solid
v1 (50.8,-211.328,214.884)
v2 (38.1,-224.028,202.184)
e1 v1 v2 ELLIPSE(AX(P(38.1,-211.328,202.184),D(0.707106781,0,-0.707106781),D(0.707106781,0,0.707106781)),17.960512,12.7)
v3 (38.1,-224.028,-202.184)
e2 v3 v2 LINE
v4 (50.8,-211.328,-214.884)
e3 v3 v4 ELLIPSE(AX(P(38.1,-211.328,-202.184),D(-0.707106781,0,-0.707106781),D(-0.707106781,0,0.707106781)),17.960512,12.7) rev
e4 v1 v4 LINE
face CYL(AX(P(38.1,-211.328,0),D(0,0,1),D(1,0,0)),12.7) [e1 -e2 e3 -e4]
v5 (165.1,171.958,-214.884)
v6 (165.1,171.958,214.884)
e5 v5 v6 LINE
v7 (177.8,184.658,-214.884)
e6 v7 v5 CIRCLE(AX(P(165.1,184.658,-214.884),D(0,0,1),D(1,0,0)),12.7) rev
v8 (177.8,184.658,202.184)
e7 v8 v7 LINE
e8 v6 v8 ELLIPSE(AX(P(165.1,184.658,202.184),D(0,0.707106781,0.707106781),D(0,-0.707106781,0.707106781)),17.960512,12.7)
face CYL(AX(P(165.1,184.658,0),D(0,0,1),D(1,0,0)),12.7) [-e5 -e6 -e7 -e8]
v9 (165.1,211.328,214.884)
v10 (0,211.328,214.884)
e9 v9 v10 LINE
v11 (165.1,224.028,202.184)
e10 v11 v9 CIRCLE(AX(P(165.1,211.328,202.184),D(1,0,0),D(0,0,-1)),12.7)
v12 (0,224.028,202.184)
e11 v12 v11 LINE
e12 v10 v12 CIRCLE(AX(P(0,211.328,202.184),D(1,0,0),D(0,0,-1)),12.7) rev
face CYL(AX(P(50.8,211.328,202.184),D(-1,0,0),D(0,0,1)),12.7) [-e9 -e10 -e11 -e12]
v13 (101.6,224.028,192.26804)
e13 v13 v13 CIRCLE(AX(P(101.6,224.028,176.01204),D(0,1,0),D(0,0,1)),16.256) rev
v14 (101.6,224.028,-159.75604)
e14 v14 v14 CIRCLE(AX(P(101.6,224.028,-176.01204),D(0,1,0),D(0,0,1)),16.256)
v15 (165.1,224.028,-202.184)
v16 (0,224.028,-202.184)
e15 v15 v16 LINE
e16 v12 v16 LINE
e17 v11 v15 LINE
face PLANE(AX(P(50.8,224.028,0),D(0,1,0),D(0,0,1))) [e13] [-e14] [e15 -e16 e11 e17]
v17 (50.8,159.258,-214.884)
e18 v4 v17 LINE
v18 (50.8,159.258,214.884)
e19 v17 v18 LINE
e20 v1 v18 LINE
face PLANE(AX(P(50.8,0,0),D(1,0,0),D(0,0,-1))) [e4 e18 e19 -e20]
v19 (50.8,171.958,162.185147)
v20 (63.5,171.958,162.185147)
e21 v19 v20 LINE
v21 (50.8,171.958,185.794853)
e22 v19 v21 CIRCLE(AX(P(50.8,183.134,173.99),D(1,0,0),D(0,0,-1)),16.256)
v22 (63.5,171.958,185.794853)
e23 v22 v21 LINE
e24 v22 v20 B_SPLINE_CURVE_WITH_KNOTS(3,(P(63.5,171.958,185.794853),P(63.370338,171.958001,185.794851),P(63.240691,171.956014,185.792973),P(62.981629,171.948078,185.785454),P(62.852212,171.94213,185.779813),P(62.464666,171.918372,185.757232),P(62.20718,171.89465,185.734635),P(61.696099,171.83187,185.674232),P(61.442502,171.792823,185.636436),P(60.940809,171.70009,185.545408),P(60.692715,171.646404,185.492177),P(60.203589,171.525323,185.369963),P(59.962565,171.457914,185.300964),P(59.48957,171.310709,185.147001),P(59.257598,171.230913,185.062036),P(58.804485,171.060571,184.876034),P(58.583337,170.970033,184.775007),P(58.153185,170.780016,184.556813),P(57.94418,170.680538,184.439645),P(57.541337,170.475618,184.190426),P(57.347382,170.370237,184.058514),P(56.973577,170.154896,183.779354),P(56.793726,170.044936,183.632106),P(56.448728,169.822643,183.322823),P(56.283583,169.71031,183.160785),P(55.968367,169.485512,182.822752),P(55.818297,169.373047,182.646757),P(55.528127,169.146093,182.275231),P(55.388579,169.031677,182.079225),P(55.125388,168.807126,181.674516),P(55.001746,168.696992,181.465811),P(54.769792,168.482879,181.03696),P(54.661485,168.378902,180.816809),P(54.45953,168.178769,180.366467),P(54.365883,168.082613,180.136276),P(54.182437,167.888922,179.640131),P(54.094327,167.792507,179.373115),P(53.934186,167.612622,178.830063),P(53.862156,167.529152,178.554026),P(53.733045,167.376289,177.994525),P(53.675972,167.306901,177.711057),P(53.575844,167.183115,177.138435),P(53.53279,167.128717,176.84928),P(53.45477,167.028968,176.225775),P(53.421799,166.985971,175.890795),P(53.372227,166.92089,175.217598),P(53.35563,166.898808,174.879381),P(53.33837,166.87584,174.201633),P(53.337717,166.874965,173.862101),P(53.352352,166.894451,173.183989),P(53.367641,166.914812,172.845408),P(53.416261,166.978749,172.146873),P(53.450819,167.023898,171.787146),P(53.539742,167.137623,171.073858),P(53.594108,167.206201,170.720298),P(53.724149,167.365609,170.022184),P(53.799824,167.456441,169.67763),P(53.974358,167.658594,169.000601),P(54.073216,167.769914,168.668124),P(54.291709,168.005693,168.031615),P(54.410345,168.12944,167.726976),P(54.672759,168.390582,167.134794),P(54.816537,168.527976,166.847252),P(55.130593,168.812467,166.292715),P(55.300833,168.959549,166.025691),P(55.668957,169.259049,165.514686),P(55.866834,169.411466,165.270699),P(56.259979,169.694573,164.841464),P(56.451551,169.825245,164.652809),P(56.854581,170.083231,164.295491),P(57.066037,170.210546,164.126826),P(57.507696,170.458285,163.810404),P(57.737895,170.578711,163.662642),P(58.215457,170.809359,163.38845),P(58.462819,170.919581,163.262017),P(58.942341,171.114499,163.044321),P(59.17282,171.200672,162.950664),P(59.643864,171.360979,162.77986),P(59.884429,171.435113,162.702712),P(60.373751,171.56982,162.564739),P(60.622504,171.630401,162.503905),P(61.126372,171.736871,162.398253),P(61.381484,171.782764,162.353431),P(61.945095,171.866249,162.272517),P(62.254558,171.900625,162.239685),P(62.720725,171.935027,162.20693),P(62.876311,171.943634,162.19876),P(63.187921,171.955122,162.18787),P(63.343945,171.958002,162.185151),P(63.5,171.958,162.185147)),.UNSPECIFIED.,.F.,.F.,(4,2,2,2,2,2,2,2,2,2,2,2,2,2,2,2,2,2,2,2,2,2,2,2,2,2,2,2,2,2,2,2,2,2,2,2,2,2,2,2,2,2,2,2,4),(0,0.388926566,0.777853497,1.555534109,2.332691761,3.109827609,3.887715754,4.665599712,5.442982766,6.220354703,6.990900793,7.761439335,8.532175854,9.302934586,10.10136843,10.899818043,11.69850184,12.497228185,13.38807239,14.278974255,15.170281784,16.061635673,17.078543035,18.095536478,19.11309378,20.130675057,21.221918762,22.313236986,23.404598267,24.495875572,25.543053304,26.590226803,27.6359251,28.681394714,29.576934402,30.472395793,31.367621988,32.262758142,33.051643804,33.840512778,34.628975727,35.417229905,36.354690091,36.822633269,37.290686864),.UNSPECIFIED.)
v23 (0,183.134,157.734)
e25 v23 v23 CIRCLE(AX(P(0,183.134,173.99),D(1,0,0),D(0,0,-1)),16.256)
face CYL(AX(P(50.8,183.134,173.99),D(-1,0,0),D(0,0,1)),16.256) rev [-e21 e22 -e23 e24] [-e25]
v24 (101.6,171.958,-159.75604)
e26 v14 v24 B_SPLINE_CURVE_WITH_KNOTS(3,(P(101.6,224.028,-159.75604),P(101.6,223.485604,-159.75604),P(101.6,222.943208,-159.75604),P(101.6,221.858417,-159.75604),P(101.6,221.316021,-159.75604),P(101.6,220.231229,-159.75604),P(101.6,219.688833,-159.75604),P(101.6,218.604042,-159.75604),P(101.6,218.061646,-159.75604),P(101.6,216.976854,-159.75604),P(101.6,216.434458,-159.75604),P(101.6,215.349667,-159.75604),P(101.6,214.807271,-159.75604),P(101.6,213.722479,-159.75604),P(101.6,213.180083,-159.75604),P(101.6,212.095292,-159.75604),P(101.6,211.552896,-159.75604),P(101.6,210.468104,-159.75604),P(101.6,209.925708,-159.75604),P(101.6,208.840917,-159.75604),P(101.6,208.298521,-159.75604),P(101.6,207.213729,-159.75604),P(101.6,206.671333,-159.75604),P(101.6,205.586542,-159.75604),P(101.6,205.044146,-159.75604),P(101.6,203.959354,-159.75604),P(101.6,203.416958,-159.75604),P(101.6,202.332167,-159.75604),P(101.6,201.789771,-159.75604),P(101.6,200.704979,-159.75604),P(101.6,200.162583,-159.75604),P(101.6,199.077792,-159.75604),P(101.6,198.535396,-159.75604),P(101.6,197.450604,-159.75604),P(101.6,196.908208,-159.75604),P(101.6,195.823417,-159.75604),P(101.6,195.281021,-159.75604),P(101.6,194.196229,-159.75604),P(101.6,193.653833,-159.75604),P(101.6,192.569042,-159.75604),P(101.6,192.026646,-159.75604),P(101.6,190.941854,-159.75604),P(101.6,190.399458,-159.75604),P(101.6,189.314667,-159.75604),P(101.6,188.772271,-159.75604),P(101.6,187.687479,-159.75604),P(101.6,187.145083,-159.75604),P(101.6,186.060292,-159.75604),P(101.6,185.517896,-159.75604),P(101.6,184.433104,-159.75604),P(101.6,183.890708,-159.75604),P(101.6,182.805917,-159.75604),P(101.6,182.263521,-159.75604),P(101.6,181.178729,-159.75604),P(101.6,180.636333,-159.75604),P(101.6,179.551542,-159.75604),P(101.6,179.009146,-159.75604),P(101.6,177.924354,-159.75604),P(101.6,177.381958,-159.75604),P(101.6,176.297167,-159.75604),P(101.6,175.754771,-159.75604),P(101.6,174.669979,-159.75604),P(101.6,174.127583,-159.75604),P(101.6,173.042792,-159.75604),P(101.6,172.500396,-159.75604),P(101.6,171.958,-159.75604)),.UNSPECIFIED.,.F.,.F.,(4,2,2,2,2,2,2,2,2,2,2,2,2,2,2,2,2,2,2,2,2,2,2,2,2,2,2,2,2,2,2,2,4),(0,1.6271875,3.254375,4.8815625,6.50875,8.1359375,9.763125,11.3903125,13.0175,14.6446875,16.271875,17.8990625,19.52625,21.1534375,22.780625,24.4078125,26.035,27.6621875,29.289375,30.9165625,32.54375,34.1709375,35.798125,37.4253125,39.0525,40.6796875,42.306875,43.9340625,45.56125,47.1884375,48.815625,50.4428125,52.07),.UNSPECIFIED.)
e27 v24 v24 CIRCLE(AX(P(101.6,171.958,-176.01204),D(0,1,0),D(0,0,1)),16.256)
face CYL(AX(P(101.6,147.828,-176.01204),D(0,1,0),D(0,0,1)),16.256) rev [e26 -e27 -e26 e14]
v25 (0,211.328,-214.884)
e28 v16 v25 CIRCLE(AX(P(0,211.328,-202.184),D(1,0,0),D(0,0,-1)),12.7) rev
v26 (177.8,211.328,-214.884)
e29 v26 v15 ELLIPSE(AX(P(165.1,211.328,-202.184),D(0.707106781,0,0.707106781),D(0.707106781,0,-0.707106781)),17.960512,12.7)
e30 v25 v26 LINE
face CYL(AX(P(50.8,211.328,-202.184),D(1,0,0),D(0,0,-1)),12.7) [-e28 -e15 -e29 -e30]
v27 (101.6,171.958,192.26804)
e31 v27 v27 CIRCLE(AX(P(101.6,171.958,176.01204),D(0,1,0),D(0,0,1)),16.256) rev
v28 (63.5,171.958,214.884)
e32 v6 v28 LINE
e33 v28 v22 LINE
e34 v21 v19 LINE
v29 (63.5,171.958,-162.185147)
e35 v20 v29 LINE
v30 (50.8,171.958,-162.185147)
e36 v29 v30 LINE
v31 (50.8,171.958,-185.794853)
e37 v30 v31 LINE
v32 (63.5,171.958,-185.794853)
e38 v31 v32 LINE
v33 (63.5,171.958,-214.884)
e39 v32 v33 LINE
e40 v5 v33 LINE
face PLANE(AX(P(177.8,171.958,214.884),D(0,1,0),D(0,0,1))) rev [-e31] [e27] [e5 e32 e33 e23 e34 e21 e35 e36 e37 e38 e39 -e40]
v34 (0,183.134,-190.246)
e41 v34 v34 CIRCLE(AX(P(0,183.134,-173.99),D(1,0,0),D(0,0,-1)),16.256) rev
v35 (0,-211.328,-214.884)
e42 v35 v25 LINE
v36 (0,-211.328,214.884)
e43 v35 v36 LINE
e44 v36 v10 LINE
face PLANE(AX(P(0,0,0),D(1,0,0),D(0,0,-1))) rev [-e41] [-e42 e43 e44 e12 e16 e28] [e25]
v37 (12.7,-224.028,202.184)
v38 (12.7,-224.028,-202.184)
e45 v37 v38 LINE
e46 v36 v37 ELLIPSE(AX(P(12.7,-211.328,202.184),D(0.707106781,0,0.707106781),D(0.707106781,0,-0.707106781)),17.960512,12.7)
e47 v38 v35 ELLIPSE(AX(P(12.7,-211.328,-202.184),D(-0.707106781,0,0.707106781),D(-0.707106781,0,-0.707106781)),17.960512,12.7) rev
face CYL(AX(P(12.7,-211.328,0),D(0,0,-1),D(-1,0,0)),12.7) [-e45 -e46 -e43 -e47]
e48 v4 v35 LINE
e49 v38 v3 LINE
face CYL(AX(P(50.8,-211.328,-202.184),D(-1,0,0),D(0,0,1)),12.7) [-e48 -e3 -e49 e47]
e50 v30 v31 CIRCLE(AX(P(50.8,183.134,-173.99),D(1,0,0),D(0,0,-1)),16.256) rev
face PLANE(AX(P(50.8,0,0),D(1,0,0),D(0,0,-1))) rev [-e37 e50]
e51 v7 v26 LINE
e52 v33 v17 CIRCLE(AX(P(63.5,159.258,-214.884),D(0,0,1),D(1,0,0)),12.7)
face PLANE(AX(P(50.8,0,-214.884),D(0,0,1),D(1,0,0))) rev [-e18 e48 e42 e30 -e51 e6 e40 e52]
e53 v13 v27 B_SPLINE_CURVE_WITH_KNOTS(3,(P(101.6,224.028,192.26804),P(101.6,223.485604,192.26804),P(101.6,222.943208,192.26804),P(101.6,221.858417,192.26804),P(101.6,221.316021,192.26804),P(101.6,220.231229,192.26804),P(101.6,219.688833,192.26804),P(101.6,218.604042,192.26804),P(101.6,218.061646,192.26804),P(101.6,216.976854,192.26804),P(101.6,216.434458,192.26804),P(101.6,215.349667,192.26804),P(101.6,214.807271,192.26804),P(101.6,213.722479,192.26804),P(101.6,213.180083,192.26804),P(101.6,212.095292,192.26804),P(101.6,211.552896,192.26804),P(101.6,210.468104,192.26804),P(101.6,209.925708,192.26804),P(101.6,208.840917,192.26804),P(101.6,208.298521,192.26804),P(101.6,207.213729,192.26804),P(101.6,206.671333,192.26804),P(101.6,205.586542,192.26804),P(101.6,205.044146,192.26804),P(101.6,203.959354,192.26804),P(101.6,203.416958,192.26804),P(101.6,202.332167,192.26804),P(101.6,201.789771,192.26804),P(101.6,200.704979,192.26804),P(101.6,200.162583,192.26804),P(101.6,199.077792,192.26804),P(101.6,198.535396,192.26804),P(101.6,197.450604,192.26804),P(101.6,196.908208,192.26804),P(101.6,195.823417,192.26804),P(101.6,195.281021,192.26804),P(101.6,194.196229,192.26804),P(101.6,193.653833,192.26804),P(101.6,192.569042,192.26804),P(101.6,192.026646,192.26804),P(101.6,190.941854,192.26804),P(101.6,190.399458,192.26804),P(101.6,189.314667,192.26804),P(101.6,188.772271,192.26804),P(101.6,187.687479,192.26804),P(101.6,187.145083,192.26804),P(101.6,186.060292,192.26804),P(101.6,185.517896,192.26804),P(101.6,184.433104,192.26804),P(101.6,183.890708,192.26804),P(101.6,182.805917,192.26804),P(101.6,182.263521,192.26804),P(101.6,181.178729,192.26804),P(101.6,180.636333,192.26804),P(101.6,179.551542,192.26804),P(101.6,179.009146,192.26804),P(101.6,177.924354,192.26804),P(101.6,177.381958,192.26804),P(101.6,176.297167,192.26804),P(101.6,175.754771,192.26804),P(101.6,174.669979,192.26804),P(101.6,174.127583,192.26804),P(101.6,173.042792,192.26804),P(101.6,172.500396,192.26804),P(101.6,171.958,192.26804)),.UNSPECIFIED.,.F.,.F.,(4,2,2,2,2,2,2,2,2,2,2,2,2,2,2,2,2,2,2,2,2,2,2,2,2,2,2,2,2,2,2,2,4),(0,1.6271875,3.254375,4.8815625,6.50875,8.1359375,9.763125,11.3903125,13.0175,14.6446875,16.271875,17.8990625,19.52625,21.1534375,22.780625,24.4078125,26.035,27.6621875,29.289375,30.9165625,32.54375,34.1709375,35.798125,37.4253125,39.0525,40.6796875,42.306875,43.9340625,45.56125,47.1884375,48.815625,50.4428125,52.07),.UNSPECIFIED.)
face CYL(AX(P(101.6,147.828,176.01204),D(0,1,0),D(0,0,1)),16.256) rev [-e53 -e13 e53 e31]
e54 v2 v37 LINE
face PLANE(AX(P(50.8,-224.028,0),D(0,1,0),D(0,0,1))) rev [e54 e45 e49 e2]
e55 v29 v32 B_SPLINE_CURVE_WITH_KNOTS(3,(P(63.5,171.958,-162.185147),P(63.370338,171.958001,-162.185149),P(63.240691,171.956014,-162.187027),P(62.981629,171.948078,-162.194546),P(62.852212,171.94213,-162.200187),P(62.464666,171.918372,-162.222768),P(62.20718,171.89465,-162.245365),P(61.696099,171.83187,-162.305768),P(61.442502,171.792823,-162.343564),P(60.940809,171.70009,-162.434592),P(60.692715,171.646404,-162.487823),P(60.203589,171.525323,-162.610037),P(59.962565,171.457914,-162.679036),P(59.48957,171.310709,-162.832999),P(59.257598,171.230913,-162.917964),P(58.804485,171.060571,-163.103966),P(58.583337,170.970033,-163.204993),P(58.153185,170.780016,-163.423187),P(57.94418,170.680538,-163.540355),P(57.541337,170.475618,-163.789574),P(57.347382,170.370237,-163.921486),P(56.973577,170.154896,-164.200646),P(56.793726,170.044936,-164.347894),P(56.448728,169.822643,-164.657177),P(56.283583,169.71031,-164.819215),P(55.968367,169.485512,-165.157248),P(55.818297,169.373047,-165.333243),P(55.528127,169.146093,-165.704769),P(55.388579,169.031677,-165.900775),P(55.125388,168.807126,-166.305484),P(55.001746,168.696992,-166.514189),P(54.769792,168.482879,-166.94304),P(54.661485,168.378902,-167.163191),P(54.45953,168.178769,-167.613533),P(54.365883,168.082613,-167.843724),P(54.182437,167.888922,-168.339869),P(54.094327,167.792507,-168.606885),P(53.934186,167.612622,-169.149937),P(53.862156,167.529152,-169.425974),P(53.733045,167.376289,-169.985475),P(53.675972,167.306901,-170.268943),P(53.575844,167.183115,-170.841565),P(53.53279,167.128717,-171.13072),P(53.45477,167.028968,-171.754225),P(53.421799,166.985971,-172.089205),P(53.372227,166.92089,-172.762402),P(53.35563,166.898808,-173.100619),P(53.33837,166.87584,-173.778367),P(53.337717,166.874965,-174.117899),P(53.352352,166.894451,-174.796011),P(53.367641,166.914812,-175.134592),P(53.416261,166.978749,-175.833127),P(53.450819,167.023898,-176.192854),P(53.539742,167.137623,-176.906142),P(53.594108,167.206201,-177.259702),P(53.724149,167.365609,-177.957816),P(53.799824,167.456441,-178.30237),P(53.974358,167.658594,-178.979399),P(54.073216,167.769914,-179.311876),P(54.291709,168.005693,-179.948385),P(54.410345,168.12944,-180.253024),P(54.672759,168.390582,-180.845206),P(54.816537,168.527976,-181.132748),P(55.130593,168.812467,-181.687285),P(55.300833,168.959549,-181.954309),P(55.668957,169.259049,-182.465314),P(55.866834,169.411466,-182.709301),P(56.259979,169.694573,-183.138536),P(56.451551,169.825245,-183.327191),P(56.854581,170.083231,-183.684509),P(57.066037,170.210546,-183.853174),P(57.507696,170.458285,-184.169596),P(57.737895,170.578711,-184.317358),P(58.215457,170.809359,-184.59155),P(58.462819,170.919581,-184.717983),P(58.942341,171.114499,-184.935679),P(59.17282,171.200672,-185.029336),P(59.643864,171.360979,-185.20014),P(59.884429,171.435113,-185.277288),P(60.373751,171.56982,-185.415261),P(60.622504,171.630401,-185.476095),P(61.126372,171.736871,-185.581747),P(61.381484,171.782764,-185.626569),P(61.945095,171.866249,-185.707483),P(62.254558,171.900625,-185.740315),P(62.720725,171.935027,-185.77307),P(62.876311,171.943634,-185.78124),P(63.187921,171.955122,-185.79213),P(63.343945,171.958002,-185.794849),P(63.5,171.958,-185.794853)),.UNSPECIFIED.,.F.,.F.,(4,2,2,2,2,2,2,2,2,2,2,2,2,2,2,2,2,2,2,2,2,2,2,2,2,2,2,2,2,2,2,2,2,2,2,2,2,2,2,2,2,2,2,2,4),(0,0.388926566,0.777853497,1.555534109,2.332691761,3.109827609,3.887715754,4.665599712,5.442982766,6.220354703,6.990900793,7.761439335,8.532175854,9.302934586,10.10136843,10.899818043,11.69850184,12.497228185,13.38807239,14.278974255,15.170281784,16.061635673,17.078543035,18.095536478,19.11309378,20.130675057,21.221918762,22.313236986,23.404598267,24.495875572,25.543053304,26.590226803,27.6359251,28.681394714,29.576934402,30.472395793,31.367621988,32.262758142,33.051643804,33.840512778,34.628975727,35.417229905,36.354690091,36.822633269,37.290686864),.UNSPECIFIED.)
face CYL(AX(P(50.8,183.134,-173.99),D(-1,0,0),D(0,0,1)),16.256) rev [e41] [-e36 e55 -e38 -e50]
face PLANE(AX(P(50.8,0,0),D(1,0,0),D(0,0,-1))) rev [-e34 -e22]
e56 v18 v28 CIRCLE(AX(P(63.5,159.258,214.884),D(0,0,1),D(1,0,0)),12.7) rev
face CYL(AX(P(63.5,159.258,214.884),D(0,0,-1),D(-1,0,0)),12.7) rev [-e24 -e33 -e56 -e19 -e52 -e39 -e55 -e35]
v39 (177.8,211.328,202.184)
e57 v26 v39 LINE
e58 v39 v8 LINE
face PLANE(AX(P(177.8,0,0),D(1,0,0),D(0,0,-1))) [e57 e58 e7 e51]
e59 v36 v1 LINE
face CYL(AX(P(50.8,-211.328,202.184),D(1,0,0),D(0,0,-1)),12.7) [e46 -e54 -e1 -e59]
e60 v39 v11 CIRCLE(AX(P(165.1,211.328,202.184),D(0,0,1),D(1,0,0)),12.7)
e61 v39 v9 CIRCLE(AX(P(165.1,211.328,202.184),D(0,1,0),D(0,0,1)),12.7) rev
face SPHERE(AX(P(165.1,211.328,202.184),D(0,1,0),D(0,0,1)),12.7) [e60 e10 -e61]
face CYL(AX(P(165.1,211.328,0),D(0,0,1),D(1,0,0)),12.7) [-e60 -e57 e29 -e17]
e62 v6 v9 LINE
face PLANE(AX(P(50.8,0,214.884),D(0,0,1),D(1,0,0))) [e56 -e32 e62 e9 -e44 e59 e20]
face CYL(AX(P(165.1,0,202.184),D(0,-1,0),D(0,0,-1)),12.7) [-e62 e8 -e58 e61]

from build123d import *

# Parameters (mm, degrees)
SKETCH1_W           = 429.768
SKETCH1_H           = 448.056
SKETCH1_R           = 16.256
BOSS_EXTRUDE1_DEPTH = 50.8
SKETCH2_W           = 429.768
SKETCH2_H           = 52.07
BOSS_EXTRUDE2_DEPTH = 127
SKETCH3_R           = 16.256
CUT_EXTRUDE1_DEPTH  = 76.2
FILLET1_R           = 12.7


with BuildPart() as part:
    # Sketch1 → Boss-Extrude1 (new body)
    with BuildSketch(Plane(origin=(0, 0, 0), x_dir=(0, 0, -1), z_dir=(1, 0, 0))):
        Rectangle(SKETCH1_W, SKETCH1_H)
        with Locations((-173.99, 183.134)):
            Circle(SKETCH1_R, mode=Mode.SUBTRACT)
        with Locations((173.99, 183.134)):
            Circle(SKETCH1_R, mode=Mode.SUBTRACT)
    extrude(amount=BOSS_EXTRUDE1_DEPTH)

    # Sketch2 → Boss-Extrude2 (add)
    with BuildSketch(Plane(origin=(50.8, 0, 0), x_dir=(0, 0, -1), z_dir=(1, 0, 0))):
        with Locations((0, 197.993)):
            Rectangle(SKETCH2_W, SKETCH2_H)
    extrude(amount=BOSS_EXTRUDE2_DEPTH)

    # Sketch3 → Cut-Extrude1 (cut)
    with BuildSketch(Plane(origin=(0, 224.028, 0), x_dir=(1, 0, 0), z_dir=(0, 1, 0))):
        with Locations(Location((101.6, 176.012040492, 0), (0, 0, 270))):
            Circle(SKETCH3_R)
        with Locations(Location((101.6, -176.012040492, 0), (0, 0, 270))):
            Circle(SKETCH3_R)
    extrude(amount=-CUT_EXTRUDE1_DEPTH, mode=Mode.SUBTRACT)

    # Fillet1
    # the kernel refuses this fillet: 12.7 mm, written as the material it adds along each edge
    with BuildSketch(Plane(origin=(50.8, 171.958, -214.884), x_dir=(0, -1, 0), z_dir=(0, 0, 1))) as fillet1_piece_1_section:
        with BuildLine():
            CenterArc((FILLET1_R, FILLET1_R), FILLET1_R, 180, 90)
            Line((0, FILLET1_R), (0, 0))
            Line((0, 0), (FILLET1_R, 0))
        make_face()
    fillet1_piece_1 = extrude(amount=60.839146761, mode=Mode.PRIVATE)
    fillet1_piece_1 = fillet1_piece_1 - Plane(origin=(53.390848129, 183.134, -173.99), x_dir=(0, 0, -1), z_dir=(-1, 0, 0)) * Cylinder(16.256, 173, mode=Mode.PRIVATE)
    add(fillet1_piece_1)
    with BuildSketch(Plane(origin=(50.8, 171.958, -193.935146761), x_dir=(0, -1, 0), z_dir=(0, 0, 1))) as fillet1_piece_2_section:
        with BuildLine():
            CenterArc((FILLET1_R, FILLET1_R), FILLET1_R, 180, 90)
            Line((0, FILLET1_R), (0, 0))
            Line((0, 0), (FILLET1_R, 0))
        make_face()
    fillet1_piece_2 = extrude(amount=387.870293522, mode=Mode.PRIVATE)
    fillet1_piece_2 = fillet1_piece_2 - Plane(origin=(53.573862422, 183.134, 173.99), x_dir=(0, 0, -1), z_dir=(-1, 0, 0)) * Cylinder(16.256, 827, mode=Mode.PRIVATE)
    fillet1_piece_2 = fillet1_piece_2 - Plane(origin=(53.573862422, 183.134, -173.99), x_dir=(0, 0, -1), z_dir=(-1, 0, 0)) * Cylinder(16.256, 827, mode=Mode.PRIVATE)
    add(fillet1_piece_2)
    with BuildSketch(Plane(origin=(50.8, 171.958, 154.044853239), x_dir=(0, -1, 0), z_dir=(0, 0, 1))) as fillet1_piece_3_section:
        with BuildLine():
            CenterArc((FILLET1_R, FILLET1_R), FILLET1_R, 180, 90)
            Line((0, FILLET1_R), (0, 0))
            Line((0, 0), (FILLET1_R, 0))
        make_face()
    fillet1_piece_3 = extrude(amount=60.839146761, mode=Mode.PRIVATE)
    fillet1_piece_3 = fillet1_piece_3 - Plane(origin=(53.390848027, 183.134, 173.99), x_dir=(0, 0, -1), z_dir=(-1, 0, 0)) * Cylinder(16.256, 173, mode=Mode.PRIVATE)
    add(fillet1_piece_3)
    # the kernel refuses this fillet: 12.7 mm, written as the material it takes off along each edge
    with BuildSketch(Plane(origin=(165.1, 211.328, 202.184), x_dir=(1, 0, 0), z_dir=(0, 1, 0))) as fillet1_2_piece_1_section:
        Polygon((0, 0), (FILLET1_R * 1.02, 0), (FILLET1_R * 1.02, -FILLET1_R * 1.02), (0, -FILLET1_R * 1.02), align=None)
    fillet1_2_piece_1 = extrude(amount=FILLET1_R * 1.02, mode=Mode.PRIVATE)
    fillet1_2_piece_1 = fillet1_2_piece_1 - Plane(origin=(165.1, 211.328, 202.184), x_dir=(-0.7071067811865475, 0, -0.7071067811865475), z_dir=(0, 1, 0)) * Sphere(FILLET1_R, mode=Mode.PRIVATE)
    add(fillet1_2_piece_1, mode=Mode.SUBTRACT)
    with BuildSketch(Plane(origin=(-31.75, -224.028, -214.884), x_dir=(0, 0, 1), z_dir=(1, 0, 0))) as fillet1_2_piece_2:
        with BuildLine():
            CenterArc((FILLET1_R, -FILLET1_R), FILLET1_R, 90, 90)
            Line((0, -FILLET1_R), (0, 0))
            Line((0, 0), (FILLET1_R, 0))
        make_face()
    extrude(amount=114.3, mode=Mode.SUBTRACT)
    with BuildSketch(Plane(origin=(-31.75, -224.028, 214.884), x_dir=(0, 0, -1), z_dir=(1, 0, 0))) as fillet1_2_piece_3:
        with BuildLine():
            CenterArc((FILLET1_R, FILLET1_R), FILLET1_R, 180, 90)
            Line((0, FILLET1_R), (0, 0))
            Line((0, 0), (FILLET1_R, 0))
        make_face()
    extrude(amount=114.3, mode=Mode.SUBTRACT)
    with BuildSketch(Plane(origin=(165.1, 224.028, 214.884), x_dir=(0, 0, -1), z_dir=(-1, 0, 0))) as fillet1_2_piece_4:
        with BuildLine():
            CenterArc((FILLET1_R, FILLET1_R), FILLET1_R, 180, 90)
            Line((0, FILLET1_R), (0, 0))
            Line((0, 0), (FILLET1_R, 0))
        make_face()
    extrude(amount=196.85, mode=Mode.SUBTRACT)
    with BuildSketch(Plane(origin=(-31.75, 224.028, -214.884), x_dir=(0, 0, 1), z_dir=(1, 0, 0))) as fillet1_2_piece_5:
        with BuildLine():
            CenterArc((FILLET1_R, FILLET1_R), FILLET1_R, 180, 90)
            Line((0, FILLET1_R), (0, 0))
            Line((0, 0), (FILLET1_R, 0))
        make_face()
    extrude(amount=241.3, mode=Mode.SUBTRACT)
    with BuildSketch(Plane(origin=(177.8, 140.208, 214.884), x_dir=(0, 0, -1), z_dir=(0, 1, 0))) as fillet1_2_piece_6:
        with BuildLine():
            CenterArc((FILLET1_R, FILLET1_R), FILLET1_R, 180, 90)
            Line((0, FILLET1_R), (0, 0))
            Line((0, 0), (FILLET1_R, 0))
        make_face()
    extrude(amount=71.12, mode=Mode.SUBTRACT)
    with BuildSketch(Plane(origin=(177.8, 171.958, -246.634), x_dir=(-1, 0, 0), z_dir=(0, 0, 1)), Plane(origin=(0, -224.028, 246.634), x_dir=(1, 0, 0), z_dir=(0, 0, -1))) as fillet1_2_piece_7:
        with BuildLine():
            CenterArc((FILLET1_R, -FILLET1_R), FILLET1_R, 90, 90)
            Line((0, -FILLET1_R), (0, 0))
            Line((0, 0), (FILLET1_R, 0))
        make_face()
    extrude(amount=493.268, mode=Mode.SUBTRACT)
    with BuildSketch(Plane(origin=(177.8, 224.028, 202.184), x_dir=(-1, 0, 0), z_dir=(0, 0, -1))) as fillet1_2_piece_8:
        with BuildLine():
            CenterArc((FILLET1_R, -FILLET1_R), FILLET1_R, 90, 90)
            Line((0, -FILLET1_R), (0, 0))
            Line((0, 0), (FILLET1_R, 0))
        make_face()
    extrude(amount=448.818, mode=Mode.SUBTRACT)
    with BuildSketch(Plane(origin=(50.8, -224.028, 246.634), x_dir=(-1, 0, 0), z_dir=(0, 0, -1))) as fillet1_2_piece_9:
        with BuildLine():
            CenterArc((FILLET1_R, FILLET1_R), FILLET1_R, 180, 90)
            Line((0, FILLET1_R), (0, 0))
            Line((0, 0), (FILLET1_R, 0))
        make_face()
    extrude(amount=493.268, mode=Mode.SUBTRACT)


solid = part.part
